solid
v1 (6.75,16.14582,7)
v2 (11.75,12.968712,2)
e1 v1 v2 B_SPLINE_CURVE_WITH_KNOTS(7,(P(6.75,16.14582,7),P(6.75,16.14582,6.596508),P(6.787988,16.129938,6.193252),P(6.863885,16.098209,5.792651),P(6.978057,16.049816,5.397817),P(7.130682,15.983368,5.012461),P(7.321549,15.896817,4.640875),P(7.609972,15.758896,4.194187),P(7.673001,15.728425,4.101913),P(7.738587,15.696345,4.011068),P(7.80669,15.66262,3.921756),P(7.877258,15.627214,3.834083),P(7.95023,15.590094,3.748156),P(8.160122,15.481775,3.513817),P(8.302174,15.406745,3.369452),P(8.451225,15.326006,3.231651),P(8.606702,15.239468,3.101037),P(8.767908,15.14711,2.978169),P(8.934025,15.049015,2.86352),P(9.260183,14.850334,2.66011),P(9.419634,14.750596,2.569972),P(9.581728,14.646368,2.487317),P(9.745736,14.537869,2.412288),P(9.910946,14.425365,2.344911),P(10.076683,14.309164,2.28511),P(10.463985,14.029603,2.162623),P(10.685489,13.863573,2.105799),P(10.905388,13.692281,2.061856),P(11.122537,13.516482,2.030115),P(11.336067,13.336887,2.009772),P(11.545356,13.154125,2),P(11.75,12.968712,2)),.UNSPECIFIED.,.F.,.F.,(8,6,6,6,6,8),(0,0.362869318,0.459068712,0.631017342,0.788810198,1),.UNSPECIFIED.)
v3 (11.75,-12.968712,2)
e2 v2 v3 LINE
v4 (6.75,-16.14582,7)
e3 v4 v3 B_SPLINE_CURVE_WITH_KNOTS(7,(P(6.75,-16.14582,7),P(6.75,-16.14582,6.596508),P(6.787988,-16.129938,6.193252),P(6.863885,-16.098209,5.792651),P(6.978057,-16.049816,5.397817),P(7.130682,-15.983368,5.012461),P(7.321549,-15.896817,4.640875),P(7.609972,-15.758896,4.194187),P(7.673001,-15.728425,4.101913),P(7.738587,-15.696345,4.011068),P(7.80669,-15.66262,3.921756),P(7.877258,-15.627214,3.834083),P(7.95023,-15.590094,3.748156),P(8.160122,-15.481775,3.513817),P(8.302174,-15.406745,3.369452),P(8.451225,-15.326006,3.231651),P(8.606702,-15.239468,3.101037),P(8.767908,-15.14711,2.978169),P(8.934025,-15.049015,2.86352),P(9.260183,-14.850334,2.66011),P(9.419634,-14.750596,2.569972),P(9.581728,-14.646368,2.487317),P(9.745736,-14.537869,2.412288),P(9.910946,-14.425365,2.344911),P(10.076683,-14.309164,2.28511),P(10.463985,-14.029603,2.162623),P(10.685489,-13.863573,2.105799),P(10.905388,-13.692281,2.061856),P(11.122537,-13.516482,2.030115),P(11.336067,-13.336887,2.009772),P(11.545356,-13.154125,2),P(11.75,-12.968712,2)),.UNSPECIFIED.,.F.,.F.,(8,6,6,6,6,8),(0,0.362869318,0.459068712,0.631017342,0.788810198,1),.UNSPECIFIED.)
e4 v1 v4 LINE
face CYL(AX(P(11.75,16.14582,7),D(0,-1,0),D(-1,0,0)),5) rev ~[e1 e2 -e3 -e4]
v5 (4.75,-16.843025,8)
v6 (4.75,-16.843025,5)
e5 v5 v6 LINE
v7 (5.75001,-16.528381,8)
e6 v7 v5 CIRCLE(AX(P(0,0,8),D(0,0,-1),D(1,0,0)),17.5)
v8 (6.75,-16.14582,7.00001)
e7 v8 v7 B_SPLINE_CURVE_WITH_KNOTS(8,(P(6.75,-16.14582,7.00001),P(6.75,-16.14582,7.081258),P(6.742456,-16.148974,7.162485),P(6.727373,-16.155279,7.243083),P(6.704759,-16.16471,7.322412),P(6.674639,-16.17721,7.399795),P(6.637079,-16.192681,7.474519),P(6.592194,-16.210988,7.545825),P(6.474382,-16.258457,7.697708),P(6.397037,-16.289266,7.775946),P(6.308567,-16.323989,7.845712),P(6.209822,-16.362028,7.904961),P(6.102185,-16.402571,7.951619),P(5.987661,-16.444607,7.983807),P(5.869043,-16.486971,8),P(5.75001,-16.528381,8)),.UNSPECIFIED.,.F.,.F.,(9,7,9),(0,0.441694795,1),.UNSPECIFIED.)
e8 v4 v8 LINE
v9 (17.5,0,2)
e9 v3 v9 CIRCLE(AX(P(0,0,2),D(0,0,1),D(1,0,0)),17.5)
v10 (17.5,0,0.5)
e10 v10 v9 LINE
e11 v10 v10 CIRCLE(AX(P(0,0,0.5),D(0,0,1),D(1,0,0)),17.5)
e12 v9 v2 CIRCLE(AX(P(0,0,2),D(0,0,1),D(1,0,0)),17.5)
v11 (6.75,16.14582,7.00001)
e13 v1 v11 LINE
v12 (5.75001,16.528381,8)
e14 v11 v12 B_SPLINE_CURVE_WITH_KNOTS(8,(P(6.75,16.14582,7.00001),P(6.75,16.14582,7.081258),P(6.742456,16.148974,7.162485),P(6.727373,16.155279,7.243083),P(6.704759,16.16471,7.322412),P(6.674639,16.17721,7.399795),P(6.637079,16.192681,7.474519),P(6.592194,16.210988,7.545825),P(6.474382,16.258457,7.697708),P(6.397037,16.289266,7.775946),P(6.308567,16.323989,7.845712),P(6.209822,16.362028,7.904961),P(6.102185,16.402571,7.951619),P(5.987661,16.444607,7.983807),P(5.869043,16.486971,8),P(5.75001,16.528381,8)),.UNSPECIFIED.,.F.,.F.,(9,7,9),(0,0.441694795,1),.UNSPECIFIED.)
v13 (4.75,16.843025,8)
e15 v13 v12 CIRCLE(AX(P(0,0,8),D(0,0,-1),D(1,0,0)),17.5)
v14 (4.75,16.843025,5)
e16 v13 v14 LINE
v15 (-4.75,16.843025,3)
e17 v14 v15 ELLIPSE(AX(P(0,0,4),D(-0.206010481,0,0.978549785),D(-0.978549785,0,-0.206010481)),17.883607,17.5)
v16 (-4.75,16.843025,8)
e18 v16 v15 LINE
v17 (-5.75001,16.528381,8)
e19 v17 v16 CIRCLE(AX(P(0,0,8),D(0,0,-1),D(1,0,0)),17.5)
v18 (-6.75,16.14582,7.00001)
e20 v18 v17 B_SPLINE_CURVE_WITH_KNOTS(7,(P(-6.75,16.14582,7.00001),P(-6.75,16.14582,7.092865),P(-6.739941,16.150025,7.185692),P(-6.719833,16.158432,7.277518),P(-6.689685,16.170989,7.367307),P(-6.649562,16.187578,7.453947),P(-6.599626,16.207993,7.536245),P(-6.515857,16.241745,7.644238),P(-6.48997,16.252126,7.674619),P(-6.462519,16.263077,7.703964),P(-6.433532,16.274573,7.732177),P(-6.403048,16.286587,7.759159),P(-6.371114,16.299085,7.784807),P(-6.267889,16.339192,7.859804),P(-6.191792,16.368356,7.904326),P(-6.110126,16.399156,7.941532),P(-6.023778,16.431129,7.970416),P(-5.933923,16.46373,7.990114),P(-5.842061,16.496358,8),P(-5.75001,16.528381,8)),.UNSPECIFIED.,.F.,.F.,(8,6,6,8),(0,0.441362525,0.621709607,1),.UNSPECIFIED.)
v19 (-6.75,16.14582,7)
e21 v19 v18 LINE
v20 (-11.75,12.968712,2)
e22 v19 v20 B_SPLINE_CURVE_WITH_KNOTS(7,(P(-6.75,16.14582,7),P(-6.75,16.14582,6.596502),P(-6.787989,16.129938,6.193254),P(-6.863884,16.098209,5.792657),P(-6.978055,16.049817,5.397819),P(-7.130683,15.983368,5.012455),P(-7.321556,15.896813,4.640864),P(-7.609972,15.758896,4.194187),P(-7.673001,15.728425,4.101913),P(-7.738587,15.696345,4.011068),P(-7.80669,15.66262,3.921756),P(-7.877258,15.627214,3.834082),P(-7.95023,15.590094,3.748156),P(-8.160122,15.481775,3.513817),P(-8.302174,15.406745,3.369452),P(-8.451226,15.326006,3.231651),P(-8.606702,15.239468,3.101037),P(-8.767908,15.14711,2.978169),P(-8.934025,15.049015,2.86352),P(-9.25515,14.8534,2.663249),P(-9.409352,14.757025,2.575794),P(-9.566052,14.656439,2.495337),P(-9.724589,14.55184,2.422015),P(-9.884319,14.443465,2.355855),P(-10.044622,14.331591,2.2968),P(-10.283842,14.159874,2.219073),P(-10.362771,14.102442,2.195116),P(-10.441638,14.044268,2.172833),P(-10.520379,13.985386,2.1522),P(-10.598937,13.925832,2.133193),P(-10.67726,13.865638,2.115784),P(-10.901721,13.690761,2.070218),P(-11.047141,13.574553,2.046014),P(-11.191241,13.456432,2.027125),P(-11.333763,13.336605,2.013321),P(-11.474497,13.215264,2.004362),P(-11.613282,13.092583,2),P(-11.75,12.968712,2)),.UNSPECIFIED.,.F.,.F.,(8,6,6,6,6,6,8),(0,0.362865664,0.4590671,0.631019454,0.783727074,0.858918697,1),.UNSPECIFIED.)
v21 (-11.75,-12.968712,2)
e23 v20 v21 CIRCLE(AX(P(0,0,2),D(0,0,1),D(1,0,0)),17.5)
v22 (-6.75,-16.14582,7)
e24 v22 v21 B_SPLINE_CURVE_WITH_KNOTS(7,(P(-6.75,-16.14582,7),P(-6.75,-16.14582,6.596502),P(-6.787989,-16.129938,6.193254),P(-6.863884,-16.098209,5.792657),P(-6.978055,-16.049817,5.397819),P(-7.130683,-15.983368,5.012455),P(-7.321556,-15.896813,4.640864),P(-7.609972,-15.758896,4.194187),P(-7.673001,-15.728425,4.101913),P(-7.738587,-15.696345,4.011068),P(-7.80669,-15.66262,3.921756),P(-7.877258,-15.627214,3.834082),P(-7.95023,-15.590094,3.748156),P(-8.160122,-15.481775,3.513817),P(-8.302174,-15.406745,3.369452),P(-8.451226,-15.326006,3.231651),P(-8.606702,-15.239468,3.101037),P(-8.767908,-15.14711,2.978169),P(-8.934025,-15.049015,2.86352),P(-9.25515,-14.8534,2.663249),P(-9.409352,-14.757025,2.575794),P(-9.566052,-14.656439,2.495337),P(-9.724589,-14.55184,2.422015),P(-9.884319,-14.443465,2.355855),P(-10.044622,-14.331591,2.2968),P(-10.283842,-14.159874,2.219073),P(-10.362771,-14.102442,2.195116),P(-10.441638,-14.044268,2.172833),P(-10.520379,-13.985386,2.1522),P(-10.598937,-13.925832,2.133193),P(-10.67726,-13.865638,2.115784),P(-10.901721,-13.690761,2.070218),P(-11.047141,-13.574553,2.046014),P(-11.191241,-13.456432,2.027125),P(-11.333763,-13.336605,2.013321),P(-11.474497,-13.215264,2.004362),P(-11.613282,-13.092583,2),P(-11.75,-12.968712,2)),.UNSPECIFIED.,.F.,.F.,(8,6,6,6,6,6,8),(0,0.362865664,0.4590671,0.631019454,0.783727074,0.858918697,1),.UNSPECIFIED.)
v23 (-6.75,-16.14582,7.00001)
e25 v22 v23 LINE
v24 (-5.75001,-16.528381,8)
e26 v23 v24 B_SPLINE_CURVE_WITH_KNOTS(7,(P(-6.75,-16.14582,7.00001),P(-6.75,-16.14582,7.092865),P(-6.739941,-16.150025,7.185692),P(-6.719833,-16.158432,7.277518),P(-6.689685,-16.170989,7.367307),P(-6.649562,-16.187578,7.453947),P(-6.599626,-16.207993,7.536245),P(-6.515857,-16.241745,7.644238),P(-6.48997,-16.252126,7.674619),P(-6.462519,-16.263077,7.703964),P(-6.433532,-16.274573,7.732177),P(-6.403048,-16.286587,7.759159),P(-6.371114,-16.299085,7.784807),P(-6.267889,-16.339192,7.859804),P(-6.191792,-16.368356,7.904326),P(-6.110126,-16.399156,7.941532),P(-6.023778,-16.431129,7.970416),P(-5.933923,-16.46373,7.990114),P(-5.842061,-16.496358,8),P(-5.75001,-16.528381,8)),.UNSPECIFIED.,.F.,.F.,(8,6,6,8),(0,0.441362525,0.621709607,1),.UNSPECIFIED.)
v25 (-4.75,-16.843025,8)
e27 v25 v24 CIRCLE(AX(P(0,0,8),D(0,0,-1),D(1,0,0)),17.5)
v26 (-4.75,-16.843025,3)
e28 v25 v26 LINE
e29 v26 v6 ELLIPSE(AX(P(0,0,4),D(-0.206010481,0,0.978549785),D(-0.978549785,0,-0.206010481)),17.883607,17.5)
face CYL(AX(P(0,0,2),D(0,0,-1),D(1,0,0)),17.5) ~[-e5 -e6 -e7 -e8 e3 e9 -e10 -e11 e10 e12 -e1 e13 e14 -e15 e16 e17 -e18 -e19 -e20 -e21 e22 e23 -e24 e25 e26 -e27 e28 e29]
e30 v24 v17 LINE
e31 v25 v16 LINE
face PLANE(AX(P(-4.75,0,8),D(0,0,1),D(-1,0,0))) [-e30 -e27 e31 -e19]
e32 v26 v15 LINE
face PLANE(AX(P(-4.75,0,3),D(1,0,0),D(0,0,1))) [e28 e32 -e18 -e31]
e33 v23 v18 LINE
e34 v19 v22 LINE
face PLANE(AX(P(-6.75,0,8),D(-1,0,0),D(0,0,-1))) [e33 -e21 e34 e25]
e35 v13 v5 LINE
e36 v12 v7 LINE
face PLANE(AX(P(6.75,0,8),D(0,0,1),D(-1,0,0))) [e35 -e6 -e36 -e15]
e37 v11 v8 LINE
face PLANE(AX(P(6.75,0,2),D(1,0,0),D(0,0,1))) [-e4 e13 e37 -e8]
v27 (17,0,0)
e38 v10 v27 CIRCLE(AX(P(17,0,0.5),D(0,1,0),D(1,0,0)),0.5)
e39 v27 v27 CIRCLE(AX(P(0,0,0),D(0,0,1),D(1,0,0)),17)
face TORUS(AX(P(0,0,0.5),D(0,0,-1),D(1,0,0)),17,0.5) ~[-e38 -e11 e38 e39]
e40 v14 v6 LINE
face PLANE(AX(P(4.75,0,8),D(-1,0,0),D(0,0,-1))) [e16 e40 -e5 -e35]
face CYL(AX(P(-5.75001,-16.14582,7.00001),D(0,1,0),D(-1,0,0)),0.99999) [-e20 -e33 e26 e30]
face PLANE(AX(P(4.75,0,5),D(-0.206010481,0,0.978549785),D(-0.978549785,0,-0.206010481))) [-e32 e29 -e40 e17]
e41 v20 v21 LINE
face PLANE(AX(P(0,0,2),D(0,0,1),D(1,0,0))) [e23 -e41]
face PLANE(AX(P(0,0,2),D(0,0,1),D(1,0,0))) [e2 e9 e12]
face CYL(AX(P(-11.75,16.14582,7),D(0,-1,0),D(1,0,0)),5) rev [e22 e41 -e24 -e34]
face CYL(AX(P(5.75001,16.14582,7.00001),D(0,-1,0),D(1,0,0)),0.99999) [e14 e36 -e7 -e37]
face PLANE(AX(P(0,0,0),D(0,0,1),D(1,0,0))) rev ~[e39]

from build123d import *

# Parameters (mm, degrees)
F0_R     = 17.5
F1_DEPTH = 2
F3_DEPTH = 20
F4_DEPTH = 6.001
F5_DEPTH = 6.001
F6_R     = 5
F7_R     = 0.99999
F8_R     = 0.5


# Not quite as in the source:
# - a fillet or chamfer is up to 0.001 mm smaller than in the source, because OpenCascade refuses the exact size


with BuildPart() as f1:
    # F0 (on Top) → F1 (new body)
    with BuildSketch(Plane.XY):
        Circle(F0_R)
    extrude(amount=F1_DEPTH)

    # F2 (on Front) → F3 (join, symmetric)
    with BuildSketch(Plane.XZ):
        Polygon((-6.75, 8), (-6.75, 2), (6.75, 2), (6.75, 8), (4.75, 8), (4.75, 5), (-4.75, 3), (-4.75, 8), align=None)
    extrude(amount=F3_DEPTH, both=True)

    # F4 (cut, through all): a face of the model
    f4_faces = [f1.faces().sort_by_distance(p)[0] for p in [
        (0, -18.5005607704, 2),
    ]]
    extrude(f4_faces, amount=-F4_DEPTH, mode=Mode.SUBTRACT)

    # F5 (cut, through all): a face of the model
    f5_faces = [f1.faces().sort_by_distance(p)[0] for p in [
        (0, 18.5005607704, 2),
    ]]
    extrude(f5_faces, amount=-F5_DEPTH, mode=Mode.SUBTRACT)

    # F6
    f6_edges = [f1.edges().sort_by_distance(p)[0] for p in [
        (-6.75, 0, 2),
        (6.75, 0, 2),
    ]]
    fillet(f6_edges, radius=F6_R)

    # F7 (radius 1 in the source; OpenCascade refuses exactly that, so slightly less here)
    f7_edges = [f1.edges().sort_by_distance(p)[0] for p in [
        (-6.75, 0, 8),
        (6.75, 0, 8),
    ]]
    fillet(f7_edges, radius=F7_R)

    # F8
    f8_edges = [f1.edges().sort_by_distance(p)[0] for p in [
        (-17.5, 0, 0),
    ]]
    fillet(f8_edges, radius=F8_R)


solid = f1.part
